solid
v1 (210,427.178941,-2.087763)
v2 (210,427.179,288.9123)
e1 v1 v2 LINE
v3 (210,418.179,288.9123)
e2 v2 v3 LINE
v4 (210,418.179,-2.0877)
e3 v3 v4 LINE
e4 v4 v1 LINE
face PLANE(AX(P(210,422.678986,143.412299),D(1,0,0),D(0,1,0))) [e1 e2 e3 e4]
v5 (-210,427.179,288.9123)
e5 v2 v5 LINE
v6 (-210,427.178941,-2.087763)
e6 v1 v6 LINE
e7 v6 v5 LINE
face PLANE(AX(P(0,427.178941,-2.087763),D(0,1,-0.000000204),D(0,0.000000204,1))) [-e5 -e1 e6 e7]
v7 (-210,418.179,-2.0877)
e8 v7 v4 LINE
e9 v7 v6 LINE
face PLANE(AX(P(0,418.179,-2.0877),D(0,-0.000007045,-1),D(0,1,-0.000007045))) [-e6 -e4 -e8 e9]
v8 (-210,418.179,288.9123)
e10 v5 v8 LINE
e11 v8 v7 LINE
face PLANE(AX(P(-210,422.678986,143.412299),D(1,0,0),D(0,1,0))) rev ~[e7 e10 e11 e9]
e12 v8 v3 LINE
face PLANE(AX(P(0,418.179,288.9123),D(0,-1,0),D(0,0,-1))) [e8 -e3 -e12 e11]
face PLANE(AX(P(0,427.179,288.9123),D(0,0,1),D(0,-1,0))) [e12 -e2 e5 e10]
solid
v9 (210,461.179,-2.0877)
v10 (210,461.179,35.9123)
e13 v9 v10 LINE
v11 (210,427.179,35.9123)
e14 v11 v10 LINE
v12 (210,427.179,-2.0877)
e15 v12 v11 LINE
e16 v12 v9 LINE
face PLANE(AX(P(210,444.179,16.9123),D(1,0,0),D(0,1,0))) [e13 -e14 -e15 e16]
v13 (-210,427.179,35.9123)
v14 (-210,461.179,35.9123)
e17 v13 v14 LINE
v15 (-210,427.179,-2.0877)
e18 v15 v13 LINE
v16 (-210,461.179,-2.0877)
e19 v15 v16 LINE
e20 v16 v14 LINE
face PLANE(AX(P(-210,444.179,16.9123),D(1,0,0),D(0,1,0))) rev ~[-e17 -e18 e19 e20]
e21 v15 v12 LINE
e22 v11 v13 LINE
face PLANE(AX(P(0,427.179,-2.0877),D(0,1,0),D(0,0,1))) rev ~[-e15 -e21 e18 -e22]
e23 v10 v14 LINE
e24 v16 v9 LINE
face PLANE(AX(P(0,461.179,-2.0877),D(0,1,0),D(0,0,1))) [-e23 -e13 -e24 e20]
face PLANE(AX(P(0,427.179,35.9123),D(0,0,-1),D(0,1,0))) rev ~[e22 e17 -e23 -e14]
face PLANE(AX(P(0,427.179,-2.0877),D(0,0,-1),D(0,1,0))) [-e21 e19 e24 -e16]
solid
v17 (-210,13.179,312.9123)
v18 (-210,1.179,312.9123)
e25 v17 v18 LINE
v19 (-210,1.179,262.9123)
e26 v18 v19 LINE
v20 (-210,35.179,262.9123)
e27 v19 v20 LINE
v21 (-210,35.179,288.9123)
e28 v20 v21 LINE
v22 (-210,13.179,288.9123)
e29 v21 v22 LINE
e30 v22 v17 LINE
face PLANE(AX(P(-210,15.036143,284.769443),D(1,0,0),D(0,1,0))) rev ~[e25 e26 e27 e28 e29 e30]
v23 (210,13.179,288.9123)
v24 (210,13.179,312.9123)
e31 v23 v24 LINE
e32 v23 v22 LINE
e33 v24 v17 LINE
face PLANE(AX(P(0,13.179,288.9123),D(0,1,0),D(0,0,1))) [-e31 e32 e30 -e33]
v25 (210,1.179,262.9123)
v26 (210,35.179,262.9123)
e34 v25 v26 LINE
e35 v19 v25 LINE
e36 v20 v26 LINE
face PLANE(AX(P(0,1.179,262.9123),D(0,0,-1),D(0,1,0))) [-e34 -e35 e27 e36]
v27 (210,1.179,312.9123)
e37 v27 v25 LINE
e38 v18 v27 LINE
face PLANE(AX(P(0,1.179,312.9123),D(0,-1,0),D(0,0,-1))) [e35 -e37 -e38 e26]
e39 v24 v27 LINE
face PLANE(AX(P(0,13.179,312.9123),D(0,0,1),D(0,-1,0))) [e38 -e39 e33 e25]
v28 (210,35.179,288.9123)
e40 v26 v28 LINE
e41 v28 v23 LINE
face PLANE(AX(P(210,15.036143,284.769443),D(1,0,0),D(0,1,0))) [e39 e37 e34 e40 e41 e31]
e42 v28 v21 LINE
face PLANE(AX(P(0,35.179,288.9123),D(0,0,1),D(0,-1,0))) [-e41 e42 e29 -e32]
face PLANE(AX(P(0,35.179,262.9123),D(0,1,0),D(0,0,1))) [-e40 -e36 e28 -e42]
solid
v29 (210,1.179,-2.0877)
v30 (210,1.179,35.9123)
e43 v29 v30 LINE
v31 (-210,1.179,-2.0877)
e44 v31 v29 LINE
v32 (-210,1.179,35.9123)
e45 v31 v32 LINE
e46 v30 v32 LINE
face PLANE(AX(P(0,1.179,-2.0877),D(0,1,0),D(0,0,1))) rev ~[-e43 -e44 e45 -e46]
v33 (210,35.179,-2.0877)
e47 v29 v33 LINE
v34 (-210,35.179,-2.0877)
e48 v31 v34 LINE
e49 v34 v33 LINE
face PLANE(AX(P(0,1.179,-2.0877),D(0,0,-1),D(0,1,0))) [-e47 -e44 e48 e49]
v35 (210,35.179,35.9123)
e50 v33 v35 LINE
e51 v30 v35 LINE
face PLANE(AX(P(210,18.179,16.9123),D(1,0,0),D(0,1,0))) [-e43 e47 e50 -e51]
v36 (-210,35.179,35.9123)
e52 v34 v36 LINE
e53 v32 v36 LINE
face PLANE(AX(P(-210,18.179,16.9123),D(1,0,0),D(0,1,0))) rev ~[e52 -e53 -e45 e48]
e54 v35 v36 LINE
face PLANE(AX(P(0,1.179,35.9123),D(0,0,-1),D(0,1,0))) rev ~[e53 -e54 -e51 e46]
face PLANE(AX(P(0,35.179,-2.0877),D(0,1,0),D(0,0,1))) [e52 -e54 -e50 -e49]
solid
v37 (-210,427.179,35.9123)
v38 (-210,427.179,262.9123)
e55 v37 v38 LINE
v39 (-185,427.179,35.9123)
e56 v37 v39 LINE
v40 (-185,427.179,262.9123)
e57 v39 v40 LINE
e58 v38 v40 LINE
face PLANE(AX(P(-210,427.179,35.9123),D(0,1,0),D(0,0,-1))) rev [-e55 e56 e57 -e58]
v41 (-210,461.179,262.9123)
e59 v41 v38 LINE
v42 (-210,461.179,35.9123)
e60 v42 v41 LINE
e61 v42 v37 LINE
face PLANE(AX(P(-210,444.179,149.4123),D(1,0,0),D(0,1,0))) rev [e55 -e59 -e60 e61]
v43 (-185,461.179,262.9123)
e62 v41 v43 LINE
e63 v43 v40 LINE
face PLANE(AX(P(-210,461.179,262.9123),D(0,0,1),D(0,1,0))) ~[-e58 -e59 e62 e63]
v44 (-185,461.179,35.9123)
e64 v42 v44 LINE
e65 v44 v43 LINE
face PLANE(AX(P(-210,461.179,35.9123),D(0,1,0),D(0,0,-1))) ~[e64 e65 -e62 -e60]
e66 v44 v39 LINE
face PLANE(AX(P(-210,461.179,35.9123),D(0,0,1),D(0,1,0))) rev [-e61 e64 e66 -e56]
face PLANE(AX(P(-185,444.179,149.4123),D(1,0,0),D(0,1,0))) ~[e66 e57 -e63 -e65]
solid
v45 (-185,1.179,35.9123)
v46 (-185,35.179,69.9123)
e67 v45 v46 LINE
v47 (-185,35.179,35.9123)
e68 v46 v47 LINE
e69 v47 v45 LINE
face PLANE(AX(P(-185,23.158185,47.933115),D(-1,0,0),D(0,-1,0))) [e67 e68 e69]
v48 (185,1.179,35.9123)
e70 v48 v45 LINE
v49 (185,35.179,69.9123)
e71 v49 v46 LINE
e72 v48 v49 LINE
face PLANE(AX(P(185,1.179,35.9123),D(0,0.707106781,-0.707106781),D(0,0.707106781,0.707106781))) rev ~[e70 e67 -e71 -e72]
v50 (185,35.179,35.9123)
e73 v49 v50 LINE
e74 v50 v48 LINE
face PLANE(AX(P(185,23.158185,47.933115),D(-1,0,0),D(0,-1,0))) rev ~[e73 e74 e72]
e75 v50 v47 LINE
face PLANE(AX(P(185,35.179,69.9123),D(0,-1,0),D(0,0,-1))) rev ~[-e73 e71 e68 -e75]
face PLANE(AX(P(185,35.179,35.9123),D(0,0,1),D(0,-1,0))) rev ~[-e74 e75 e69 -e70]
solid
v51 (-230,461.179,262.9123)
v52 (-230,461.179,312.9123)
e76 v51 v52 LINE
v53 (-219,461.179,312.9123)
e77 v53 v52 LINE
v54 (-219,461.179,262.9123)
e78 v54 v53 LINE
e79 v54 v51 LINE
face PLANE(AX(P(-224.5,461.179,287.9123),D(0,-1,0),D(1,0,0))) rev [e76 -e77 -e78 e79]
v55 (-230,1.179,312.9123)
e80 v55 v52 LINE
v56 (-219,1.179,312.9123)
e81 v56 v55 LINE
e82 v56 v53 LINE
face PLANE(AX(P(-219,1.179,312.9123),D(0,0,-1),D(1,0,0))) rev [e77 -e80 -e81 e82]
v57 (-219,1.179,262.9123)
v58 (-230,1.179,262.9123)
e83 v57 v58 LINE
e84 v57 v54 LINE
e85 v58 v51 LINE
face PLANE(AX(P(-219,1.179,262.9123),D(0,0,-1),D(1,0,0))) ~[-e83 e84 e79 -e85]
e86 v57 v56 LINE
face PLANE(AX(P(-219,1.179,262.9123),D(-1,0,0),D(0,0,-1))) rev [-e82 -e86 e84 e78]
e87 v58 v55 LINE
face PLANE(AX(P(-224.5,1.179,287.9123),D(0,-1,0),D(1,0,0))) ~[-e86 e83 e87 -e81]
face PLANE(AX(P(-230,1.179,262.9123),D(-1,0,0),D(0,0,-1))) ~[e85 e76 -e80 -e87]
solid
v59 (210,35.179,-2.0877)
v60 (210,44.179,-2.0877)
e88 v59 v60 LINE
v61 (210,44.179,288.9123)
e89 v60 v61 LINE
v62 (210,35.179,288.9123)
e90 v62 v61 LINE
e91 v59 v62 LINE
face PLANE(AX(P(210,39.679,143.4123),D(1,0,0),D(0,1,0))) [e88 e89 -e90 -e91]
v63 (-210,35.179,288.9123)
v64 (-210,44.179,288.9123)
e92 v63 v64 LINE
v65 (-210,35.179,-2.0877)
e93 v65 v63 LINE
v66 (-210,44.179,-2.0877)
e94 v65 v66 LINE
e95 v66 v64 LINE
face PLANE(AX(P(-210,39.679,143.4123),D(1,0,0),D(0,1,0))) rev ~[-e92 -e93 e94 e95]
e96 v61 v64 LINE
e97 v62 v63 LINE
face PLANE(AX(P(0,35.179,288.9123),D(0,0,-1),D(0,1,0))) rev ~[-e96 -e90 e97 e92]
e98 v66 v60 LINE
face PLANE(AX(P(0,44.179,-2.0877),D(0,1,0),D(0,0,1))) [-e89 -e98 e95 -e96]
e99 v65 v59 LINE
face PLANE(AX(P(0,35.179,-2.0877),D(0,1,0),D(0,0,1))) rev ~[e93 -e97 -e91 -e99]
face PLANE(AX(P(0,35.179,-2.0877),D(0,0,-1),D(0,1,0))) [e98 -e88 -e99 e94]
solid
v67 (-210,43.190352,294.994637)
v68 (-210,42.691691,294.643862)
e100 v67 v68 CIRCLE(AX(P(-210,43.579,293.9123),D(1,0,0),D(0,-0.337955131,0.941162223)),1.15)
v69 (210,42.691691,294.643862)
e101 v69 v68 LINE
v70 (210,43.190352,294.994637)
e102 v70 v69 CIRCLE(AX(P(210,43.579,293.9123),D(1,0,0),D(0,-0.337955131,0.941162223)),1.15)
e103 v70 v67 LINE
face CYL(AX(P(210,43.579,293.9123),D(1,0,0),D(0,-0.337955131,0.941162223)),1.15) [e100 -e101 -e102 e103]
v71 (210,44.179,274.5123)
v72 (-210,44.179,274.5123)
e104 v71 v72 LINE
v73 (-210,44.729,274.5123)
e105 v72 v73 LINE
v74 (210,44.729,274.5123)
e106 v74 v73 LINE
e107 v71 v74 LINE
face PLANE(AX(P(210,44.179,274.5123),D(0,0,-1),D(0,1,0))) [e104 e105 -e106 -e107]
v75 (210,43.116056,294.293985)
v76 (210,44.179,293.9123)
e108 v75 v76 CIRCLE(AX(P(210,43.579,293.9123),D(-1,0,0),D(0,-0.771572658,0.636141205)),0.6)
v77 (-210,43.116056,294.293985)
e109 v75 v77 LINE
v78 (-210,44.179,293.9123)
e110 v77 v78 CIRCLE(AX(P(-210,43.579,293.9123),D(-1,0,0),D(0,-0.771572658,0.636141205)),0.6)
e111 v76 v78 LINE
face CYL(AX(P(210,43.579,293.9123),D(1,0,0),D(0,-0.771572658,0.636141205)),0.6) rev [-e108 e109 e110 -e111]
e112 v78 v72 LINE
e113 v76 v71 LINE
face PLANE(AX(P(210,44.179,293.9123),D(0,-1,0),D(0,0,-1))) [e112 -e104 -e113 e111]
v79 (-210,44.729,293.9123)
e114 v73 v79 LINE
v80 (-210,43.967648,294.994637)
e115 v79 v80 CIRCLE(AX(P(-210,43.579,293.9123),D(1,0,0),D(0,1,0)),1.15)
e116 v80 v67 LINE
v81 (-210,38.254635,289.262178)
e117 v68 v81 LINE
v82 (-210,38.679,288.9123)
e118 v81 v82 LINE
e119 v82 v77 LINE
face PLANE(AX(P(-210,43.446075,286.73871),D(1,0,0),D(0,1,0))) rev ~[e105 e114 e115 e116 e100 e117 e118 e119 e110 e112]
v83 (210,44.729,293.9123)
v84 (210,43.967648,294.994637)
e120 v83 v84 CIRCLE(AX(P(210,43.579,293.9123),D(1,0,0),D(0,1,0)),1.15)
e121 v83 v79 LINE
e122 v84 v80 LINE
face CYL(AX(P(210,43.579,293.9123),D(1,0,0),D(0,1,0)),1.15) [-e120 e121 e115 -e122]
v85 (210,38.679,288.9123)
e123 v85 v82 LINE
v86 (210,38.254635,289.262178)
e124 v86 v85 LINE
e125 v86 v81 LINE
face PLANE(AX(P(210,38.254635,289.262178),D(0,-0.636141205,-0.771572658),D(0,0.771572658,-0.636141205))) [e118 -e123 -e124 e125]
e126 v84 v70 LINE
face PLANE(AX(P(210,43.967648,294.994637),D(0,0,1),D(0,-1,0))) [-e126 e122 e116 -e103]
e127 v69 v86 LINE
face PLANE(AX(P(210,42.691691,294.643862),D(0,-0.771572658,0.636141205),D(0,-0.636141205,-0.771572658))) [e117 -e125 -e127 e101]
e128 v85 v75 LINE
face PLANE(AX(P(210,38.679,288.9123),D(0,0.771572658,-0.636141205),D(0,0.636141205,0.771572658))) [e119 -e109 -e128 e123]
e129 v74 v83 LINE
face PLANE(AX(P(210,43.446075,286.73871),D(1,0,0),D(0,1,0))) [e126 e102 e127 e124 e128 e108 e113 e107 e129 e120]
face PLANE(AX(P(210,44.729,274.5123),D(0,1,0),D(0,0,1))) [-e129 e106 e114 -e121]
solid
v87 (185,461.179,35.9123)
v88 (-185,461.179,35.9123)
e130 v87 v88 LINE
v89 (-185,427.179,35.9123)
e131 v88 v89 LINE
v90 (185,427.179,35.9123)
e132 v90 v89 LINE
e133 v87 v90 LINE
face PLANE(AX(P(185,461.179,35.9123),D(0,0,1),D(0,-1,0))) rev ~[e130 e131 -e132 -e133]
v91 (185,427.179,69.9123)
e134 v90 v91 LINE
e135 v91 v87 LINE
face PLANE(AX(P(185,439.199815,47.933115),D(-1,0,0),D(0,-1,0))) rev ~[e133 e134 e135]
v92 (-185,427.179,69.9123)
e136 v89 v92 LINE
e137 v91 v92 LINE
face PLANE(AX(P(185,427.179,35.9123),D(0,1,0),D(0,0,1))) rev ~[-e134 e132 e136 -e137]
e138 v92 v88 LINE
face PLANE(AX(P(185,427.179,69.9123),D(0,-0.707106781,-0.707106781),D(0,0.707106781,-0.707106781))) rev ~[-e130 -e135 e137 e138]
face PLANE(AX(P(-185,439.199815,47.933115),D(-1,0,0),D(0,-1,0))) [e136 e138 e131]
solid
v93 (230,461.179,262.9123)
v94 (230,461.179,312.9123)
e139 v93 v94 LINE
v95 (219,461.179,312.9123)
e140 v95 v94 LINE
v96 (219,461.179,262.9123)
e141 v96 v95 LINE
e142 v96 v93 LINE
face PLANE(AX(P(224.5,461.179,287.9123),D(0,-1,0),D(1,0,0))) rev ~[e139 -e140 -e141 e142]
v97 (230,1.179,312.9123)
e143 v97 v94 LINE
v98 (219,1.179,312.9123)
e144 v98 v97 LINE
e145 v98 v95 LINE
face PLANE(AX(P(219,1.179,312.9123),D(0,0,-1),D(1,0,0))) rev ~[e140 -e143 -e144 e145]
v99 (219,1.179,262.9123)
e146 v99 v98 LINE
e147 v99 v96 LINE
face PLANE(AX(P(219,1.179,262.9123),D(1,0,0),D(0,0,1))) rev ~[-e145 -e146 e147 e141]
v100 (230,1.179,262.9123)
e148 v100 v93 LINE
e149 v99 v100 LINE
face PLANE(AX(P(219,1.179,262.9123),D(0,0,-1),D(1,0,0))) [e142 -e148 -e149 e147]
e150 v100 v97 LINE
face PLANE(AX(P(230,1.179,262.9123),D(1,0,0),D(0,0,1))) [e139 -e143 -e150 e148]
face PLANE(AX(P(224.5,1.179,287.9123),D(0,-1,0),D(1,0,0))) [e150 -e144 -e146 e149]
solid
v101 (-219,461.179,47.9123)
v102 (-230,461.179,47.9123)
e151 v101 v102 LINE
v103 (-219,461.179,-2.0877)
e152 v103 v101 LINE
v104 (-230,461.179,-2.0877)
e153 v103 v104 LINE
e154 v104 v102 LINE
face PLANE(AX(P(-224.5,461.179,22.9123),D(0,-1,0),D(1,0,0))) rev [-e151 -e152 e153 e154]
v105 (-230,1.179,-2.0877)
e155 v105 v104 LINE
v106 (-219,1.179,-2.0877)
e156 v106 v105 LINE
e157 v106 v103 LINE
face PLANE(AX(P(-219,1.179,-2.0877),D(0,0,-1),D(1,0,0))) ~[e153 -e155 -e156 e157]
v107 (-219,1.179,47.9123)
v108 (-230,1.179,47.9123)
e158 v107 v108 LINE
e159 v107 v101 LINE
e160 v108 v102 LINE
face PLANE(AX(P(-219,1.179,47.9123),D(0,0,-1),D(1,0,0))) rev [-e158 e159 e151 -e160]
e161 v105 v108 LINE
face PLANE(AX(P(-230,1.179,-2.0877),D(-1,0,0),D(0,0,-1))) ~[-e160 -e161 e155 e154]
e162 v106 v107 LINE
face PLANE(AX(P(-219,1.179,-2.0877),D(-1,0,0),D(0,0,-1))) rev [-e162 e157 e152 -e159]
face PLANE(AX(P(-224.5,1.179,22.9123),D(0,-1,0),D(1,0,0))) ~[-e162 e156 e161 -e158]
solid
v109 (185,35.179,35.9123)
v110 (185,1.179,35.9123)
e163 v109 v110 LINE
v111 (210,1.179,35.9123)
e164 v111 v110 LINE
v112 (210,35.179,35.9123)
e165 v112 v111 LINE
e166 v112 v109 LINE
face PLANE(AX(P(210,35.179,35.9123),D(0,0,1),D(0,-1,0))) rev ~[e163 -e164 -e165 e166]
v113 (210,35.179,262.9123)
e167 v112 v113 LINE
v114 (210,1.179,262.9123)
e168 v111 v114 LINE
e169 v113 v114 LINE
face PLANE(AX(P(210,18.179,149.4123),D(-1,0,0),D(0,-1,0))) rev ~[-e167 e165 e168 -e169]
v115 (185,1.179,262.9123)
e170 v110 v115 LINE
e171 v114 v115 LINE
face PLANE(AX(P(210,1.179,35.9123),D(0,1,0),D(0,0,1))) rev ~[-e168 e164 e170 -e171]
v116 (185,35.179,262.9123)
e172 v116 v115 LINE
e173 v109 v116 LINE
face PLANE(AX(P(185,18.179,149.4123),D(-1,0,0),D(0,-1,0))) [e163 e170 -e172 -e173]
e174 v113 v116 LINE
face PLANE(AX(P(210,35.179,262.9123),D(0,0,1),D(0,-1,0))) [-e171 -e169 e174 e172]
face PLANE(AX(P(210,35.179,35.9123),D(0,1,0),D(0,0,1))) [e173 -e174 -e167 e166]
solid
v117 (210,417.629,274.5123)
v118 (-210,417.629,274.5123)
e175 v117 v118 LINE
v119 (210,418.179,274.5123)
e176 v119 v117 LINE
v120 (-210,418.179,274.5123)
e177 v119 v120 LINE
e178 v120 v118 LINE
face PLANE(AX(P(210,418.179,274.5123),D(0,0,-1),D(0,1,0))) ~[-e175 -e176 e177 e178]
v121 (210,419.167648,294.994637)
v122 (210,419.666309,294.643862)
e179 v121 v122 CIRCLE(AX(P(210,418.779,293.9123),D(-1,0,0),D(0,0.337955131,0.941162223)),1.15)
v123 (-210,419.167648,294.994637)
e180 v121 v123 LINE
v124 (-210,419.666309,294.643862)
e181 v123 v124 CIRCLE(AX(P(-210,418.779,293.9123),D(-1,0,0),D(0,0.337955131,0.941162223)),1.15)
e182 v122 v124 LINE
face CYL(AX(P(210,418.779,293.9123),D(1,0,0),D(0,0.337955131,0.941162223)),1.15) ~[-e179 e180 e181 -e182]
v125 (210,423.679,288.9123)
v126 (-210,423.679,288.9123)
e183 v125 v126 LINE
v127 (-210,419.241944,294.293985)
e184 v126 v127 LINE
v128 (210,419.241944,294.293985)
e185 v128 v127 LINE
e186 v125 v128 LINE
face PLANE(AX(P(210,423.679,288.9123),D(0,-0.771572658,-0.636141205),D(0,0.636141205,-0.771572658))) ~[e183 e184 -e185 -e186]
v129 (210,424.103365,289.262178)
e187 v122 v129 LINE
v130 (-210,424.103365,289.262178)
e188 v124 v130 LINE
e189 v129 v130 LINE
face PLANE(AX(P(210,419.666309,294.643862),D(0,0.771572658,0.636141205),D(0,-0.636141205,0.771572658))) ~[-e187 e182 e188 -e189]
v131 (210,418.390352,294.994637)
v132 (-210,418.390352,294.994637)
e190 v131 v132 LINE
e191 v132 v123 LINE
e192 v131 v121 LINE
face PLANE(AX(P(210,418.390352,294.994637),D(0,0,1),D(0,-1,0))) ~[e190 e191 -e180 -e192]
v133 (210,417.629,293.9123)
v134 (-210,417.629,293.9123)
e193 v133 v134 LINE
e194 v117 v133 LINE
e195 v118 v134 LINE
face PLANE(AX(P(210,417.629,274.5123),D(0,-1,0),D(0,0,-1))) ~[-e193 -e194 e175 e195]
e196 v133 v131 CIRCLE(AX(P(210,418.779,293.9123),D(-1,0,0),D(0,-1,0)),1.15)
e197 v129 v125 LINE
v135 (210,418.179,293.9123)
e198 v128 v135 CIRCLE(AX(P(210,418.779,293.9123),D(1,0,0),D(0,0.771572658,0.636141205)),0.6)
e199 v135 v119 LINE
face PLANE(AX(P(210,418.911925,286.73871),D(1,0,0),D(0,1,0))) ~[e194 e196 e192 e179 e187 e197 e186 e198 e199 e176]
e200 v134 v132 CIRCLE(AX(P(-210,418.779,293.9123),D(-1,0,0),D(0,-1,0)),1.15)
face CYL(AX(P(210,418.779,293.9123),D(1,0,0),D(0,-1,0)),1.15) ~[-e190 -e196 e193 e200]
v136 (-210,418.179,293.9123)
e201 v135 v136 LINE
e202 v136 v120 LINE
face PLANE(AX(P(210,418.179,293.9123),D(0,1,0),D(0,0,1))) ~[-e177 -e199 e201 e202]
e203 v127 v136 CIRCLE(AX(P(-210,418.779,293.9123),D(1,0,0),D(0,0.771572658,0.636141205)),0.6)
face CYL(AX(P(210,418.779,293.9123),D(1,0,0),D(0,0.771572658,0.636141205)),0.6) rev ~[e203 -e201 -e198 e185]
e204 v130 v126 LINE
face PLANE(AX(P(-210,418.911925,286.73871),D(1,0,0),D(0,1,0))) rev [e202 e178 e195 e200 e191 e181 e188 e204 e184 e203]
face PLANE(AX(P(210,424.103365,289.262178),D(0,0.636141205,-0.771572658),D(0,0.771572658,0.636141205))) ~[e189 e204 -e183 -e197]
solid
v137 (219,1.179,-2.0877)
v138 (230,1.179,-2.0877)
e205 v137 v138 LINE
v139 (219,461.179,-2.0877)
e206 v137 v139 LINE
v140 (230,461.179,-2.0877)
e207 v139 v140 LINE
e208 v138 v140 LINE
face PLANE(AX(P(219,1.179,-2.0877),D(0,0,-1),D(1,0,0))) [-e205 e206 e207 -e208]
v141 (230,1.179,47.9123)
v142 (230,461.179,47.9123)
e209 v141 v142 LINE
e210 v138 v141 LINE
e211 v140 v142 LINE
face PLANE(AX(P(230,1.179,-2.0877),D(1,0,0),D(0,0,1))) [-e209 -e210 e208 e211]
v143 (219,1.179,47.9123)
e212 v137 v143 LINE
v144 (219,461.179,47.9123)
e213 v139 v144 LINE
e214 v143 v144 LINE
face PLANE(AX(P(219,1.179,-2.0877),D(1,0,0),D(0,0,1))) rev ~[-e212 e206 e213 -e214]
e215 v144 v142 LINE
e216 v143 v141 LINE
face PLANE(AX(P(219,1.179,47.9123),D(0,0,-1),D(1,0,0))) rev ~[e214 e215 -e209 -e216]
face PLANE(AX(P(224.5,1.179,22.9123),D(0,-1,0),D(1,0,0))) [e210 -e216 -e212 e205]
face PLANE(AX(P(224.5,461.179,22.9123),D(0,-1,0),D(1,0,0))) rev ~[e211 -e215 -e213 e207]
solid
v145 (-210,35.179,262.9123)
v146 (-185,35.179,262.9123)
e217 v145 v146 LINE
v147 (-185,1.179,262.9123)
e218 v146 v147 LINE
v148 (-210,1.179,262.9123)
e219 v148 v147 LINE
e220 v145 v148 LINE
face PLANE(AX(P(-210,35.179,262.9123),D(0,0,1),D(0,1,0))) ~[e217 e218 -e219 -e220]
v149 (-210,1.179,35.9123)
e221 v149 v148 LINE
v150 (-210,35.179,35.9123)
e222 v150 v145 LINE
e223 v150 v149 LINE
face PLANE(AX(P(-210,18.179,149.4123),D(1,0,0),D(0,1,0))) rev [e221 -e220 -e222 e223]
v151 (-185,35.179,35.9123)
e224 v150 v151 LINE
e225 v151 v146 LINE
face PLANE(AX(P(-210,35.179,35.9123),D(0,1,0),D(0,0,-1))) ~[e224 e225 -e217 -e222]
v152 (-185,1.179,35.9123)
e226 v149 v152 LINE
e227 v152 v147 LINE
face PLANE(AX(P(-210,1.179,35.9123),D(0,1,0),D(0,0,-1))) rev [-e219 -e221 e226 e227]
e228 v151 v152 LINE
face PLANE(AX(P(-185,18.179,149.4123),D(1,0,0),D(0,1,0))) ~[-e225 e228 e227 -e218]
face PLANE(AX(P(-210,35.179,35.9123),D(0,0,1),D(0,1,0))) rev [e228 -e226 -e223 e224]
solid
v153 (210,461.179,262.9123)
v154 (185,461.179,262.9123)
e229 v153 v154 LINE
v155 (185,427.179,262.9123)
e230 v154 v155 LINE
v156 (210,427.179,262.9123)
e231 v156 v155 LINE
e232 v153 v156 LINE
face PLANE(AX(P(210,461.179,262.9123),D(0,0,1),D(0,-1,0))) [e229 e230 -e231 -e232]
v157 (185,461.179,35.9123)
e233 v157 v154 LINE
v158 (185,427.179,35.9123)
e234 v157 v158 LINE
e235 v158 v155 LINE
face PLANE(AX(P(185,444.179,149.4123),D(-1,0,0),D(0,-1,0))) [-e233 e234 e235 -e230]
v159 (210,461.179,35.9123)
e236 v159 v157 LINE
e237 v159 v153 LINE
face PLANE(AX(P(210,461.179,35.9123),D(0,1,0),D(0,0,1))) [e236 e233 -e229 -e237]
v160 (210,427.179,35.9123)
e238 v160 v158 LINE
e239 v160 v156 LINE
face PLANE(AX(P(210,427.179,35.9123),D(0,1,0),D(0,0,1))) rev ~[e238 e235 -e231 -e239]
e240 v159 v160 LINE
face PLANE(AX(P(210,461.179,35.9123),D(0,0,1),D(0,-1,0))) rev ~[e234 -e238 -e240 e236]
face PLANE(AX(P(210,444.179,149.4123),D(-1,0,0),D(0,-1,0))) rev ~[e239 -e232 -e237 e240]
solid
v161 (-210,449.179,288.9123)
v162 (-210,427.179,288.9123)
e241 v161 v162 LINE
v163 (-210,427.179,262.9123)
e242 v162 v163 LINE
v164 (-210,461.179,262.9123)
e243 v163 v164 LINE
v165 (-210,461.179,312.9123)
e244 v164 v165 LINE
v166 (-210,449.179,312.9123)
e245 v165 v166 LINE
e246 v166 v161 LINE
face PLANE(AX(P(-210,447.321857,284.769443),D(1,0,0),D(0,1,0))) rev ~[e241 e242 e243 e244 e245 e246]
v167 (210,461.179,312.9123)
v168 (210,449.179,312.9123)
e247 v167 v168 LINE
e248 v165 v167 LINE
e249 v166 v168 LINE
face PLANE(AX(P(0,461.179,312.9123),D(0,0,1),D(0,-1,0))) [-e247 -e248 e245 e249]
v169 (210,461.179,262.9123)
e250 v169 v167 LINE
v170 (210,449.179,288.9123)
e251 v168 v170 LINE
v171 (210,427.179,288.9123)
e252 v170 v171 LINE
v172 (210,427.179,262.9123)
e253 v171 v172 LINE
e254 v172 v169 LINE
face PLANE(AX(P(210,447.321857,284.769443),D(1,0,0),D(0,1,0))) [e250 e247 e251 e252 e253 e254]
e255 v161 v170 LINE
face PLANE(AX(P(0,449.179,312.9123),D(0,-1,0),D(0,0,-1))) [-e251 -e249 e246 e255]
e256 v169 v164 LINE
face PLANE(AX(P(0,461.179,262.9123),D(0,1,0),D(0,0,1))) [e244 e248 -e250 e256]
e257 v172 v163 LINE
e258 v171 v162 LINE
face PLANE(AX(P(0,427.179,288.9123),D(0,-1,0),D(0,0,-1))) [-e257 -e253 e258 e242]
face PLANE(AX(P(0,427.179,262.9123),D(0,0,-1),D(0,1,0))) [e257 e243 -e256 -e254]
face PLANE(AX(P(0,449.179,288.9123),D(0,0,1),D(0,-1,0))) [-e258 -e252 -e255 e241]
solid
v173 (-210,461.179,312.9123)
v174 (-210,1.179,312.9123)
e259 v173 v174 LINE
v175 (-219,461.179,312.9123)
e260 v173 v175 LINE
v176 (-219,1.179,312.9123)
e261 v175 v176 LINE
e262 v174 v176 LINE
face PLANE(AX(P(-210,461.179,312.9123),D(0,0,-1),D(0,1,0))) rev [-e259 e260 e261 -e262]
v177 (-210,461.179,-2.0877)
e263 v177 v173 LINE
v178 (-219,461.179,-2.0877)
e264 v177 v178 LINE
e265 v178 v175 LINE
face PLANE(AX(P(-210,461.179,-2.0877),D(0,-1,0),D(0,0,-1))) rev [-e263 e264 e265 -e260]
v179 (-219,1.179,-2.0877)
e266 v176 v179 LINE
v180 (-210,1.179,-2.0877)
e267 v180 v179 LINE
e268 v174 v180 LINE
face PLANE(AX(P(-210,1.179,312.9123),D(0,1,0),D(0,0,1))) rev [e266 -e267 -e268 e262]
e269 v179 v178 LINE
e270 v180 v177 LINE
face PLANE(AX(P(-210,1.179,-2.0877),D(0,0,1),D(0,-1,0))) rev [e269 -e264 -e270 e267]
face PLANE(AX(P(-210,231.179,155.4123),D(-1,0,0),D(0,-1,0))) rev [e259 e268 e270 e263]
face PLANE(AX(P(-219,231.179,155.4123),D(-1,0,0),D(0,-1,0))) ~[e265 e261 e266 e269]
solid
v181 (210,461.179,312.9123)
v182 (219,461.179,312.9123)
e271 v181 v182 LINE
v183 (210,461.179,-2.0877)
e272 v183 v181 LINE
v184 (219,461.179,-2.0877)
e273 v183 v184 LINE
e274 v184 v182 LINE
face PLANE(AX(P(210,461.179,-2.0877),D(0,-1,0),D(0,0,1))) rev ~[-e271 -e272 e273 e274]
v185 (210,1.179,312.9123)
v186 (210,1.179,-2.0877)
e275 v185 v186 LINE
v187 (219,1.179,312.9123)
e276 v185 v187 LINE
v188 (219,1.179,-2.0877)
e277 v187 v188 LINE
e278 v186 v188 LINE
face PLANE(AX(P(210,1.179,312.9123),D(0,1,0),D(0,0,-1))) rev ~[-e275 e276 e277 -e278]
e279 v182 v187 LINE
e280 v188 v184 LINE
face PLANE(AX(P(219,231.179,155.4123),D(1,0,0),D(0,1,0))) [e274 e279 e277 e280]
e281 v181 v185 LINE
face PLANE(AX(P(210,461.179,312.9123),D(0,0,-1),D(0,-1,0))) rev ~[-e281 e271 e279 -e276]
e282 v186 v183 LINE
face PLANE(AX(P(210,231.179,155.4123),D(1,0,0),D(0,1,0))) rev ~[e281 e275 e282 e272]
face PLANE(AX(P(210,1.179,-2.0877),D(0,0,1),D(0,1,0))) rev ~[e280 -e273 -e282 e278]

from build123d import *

# Parameters (mm, degrees)
F0_W      = 9
F0_H      = 291
F1_DEPTH  = 210
F2_W      = 34
F2_H      = 38
F3_DEPTH  = 210
F5_DEPTH  = 420
F9_DEPTH  = 9
F10_W     = 11
F10_H     = 50
F11_DEPTH = 460
F12_W     = 34
F12_H     = 227
F13_DEPTH = 25
F16_DEPTH = 370


# Not quite as in the source:
# - ends of sketch curves that miss each other by under 0.0002 mm in the source are joined


with BuildPart() as f1:
    # F0 (on Right) → F1 (new body, symmetric)
    with BuildSketch(Plane.YZ):
        with Locations((39.679, 143.4123)):
            Rectangle(F0_W, F0_H)
    extrude(amount=F1_DEPTH, both=True)


with BuildPart() as f1b:
    # F0 (on Right) → F1, piece 2 (new body, symmetric)
    with BuildSketch(Plane.YZ):
        Polygon((427.179, 288.9123), (418.179, 288.9123), (418.179, -2.0877000002), (427.1789405548, -2.0877634065), align=None)
    extrude(amount=F1_DEPTH, both=True)


with BuildPart() as f3:
    # F2 (on Right) → F3 (new body, symmetric)
    with BuildSketch(Plane.YZ):
        with Locations((18.179, 16.9123)):
            Rectangle(F2_W, F2_H)
    extrude(amount=F3_DEPTH, both=True)


with BuildPart() as f3b:
    # F2 (on Right) → F3, piece 2 (new body, symmetric)
    with BuildSketch(Plane.YZ):
        Polygon((13.179, 312.9123), (1.179, 312.9123), (1.179, 262.9123), (35.179, 262.9123), (35.179, 288.9123), (13.179, 288.9123), align=None)
    extrude(amount=F3_DEPTH, both=True)


with BuildPart() as f3c:
    # F2 (on Right) → F3, piece 3 (new body, symmetric)
    with BuildSketch(Plane.YZ):
        Polygon((461.179, 262.9123), (461.179, 312.9123), (449.179, 312.9123), (449.179, 288.9123), (427.179, 288.9123), (427.179, 262.9123), align=None)
    extrude(amount=F3_DEPTH, both=True)


with BuildPart() as f3d:
    # F2 (on Right) → F3, piece 4 (new body, symmetric)
    with BuildSketch(Plane.YZ):
        with Locations((444.179, 16.9123)):
            Rectangle(F2_W, F2_H)
    extrude(amount=F3_DEPTH, both=True)


with BuildPart() as f5:
    # F4 (on face) → F5 (new body, through all)
    with BuildSketch(Plane.YZ.offset(210)):
        with BuildLine():
            ThreePointArc((43.116056405, 294.2939847231), (43.7817730788, 294.4769973335), (44.179, 293.9123))
            Line((44.179, 293.9123), (44.179, 274.5123))
            Line((44.179, 274.5123), (44.729, 274.5123))
            Line((44.729, 274.5123), (44.729, 293.9123))
            ThreePointArc((44.729, 293.9123), (44.5195970607, 294.5739473149), (43.9676484011, 294.9946365559))
            Line((43.9676484011, 294.9946365559), (43.1903515989, 294.9946365559))
            ThreePointArc((43.1903515989, 294.9946365559), (42.9173526851, 294.8528970607), (42.6916914429, 294.6438623859))
            Line((42.6916914429, 294.6438623859), (38.2546350379, 289.2621776628))
            Line((38.2546350379, 289.2621776628), (38.679, 288.9123))
            Line((38.679, 288.9123), (43.116056405, 294.2939847231))
        make_face()
    extrude(amount=-F5_DEPTH)


with BuildPart() as f7_1:
    # F7: instance of F5
    add(f5.part.mirror(Plane(origin=(0, 231.179, 143.4122999999), x_dir=(-1, 0, 0), z_dir=(0, 1, 0))))


with BuildPart() as f9:
    # F8 (on face) → F9 (new body)
    with BuildSketch(Plane.YZ.offset(210)):
        Polygon((1.179, 312.9123), (1.179, -2.0877), (461.179, -2.0877), (461.179, 312.9123), (13.179, 312.9123), align=None)
    extrude(amount=F9_DEPTH)


with BuildPart() as f11:
    # F10 (on face) → F11 (new body, through all)
    with BuildSketch(Plane.XZ.offset(-1.179)):
        with Locations((224.5, 287.9123)):
            Rectangle(F10_W, F10_H)
    extrude(amount=-F11_DEPTH)


with BuildPart() as f11b:
    # F10 (on face) → F11, piece 2 (new body, through all)
    with BuildSketch(Plane.XZ.offset(-1.179)):
        with Locations((224.5, 22.9123)):
            Rectangle(F10_W, F10_H)
    extrude(amount=-F11_DEPTH)


with BuildPart() as f13:
    # F12 (on face) → F13 (new body)
    with BuildSketch(Plane(origin=(210, 0, 0), x_dir=(0, -1, 0), z_dir=(-1, 0, 0))):
        with Locations((-18.179, 149.4123)):
            Rectangle(F12_W, F12_H)
    extrude(amount=F13_DEPTH)


with BuildPart() as f13b:
    # F12 (on face) → F13, piece 2 (new body)
    with BuildSketch(Plane(origin=(210, 0, 0), x_dir=(0, -1, 0), z_dir=(-1, 0, 0))):
        with Locations((-444.179, 149.4123)):
            Rectangle(F12_W, F12_H)
    extrude(amount=F13_DEPTH)


with BuildPart() as f14_1:
    # F14: instance of F9
    add(f9.part.mirror(Plane.YZ))


with BuildPart() as f14_2:
    # F14: instance of F11b
    add(f11b.part.mirror(Plane.YZ))


with BuildPart() as f14_3:
    # F14: instance of F11
    add(f11.part.mirror(Plane.YZ))


with BuildPart() as f14_4:
    # F14: instance of F13
    add(f13.part.mirror(Plane.YZ))


with BuildPart() as f14_5:
    # F14: instance of F13b
    add(f13b.part.mirror(Plane.YZ))


with BuildPart() as f16:
    # F15 (on face) → F16 (new body, through all)
    with BuildSketch(Plane(origin=(185, 0, 0), x_dir=(0, -1, 0), z_dir=(-1, 0, 0))):
        Polygon((-35.179, 69.9123), (-35.179, 35.9123), (-1.179, 35.9123), align=None)
    extrude(amount=F16_DEPTH)


with BuildPart() as f16b:
    # F15 (on face) → F16, piece 2 (new body, through all)
    with BuildSketch(Plane(origin=(185, 0, 0), x_dir=(0, -1, 0), z_dir=(-1, 0, 0))):
        Polygon((-427.179, 35.9123), (-427.179, 69.9123), (-461.179, 35.9123), align=None)
    extrude(amount=F16_DEPTH)


solid = Compound([f1.part, f1b.part, f3.part, f3b.part, f3c.part, f3d.part, f5.part, f7_1.part, f9.part, f11.part, f11b.part, f13.part, f13b.part, f14_1.part, f14_2.part, f14_3.part, f14_4.part, f14_5.part, f16.part, f16b.part])
